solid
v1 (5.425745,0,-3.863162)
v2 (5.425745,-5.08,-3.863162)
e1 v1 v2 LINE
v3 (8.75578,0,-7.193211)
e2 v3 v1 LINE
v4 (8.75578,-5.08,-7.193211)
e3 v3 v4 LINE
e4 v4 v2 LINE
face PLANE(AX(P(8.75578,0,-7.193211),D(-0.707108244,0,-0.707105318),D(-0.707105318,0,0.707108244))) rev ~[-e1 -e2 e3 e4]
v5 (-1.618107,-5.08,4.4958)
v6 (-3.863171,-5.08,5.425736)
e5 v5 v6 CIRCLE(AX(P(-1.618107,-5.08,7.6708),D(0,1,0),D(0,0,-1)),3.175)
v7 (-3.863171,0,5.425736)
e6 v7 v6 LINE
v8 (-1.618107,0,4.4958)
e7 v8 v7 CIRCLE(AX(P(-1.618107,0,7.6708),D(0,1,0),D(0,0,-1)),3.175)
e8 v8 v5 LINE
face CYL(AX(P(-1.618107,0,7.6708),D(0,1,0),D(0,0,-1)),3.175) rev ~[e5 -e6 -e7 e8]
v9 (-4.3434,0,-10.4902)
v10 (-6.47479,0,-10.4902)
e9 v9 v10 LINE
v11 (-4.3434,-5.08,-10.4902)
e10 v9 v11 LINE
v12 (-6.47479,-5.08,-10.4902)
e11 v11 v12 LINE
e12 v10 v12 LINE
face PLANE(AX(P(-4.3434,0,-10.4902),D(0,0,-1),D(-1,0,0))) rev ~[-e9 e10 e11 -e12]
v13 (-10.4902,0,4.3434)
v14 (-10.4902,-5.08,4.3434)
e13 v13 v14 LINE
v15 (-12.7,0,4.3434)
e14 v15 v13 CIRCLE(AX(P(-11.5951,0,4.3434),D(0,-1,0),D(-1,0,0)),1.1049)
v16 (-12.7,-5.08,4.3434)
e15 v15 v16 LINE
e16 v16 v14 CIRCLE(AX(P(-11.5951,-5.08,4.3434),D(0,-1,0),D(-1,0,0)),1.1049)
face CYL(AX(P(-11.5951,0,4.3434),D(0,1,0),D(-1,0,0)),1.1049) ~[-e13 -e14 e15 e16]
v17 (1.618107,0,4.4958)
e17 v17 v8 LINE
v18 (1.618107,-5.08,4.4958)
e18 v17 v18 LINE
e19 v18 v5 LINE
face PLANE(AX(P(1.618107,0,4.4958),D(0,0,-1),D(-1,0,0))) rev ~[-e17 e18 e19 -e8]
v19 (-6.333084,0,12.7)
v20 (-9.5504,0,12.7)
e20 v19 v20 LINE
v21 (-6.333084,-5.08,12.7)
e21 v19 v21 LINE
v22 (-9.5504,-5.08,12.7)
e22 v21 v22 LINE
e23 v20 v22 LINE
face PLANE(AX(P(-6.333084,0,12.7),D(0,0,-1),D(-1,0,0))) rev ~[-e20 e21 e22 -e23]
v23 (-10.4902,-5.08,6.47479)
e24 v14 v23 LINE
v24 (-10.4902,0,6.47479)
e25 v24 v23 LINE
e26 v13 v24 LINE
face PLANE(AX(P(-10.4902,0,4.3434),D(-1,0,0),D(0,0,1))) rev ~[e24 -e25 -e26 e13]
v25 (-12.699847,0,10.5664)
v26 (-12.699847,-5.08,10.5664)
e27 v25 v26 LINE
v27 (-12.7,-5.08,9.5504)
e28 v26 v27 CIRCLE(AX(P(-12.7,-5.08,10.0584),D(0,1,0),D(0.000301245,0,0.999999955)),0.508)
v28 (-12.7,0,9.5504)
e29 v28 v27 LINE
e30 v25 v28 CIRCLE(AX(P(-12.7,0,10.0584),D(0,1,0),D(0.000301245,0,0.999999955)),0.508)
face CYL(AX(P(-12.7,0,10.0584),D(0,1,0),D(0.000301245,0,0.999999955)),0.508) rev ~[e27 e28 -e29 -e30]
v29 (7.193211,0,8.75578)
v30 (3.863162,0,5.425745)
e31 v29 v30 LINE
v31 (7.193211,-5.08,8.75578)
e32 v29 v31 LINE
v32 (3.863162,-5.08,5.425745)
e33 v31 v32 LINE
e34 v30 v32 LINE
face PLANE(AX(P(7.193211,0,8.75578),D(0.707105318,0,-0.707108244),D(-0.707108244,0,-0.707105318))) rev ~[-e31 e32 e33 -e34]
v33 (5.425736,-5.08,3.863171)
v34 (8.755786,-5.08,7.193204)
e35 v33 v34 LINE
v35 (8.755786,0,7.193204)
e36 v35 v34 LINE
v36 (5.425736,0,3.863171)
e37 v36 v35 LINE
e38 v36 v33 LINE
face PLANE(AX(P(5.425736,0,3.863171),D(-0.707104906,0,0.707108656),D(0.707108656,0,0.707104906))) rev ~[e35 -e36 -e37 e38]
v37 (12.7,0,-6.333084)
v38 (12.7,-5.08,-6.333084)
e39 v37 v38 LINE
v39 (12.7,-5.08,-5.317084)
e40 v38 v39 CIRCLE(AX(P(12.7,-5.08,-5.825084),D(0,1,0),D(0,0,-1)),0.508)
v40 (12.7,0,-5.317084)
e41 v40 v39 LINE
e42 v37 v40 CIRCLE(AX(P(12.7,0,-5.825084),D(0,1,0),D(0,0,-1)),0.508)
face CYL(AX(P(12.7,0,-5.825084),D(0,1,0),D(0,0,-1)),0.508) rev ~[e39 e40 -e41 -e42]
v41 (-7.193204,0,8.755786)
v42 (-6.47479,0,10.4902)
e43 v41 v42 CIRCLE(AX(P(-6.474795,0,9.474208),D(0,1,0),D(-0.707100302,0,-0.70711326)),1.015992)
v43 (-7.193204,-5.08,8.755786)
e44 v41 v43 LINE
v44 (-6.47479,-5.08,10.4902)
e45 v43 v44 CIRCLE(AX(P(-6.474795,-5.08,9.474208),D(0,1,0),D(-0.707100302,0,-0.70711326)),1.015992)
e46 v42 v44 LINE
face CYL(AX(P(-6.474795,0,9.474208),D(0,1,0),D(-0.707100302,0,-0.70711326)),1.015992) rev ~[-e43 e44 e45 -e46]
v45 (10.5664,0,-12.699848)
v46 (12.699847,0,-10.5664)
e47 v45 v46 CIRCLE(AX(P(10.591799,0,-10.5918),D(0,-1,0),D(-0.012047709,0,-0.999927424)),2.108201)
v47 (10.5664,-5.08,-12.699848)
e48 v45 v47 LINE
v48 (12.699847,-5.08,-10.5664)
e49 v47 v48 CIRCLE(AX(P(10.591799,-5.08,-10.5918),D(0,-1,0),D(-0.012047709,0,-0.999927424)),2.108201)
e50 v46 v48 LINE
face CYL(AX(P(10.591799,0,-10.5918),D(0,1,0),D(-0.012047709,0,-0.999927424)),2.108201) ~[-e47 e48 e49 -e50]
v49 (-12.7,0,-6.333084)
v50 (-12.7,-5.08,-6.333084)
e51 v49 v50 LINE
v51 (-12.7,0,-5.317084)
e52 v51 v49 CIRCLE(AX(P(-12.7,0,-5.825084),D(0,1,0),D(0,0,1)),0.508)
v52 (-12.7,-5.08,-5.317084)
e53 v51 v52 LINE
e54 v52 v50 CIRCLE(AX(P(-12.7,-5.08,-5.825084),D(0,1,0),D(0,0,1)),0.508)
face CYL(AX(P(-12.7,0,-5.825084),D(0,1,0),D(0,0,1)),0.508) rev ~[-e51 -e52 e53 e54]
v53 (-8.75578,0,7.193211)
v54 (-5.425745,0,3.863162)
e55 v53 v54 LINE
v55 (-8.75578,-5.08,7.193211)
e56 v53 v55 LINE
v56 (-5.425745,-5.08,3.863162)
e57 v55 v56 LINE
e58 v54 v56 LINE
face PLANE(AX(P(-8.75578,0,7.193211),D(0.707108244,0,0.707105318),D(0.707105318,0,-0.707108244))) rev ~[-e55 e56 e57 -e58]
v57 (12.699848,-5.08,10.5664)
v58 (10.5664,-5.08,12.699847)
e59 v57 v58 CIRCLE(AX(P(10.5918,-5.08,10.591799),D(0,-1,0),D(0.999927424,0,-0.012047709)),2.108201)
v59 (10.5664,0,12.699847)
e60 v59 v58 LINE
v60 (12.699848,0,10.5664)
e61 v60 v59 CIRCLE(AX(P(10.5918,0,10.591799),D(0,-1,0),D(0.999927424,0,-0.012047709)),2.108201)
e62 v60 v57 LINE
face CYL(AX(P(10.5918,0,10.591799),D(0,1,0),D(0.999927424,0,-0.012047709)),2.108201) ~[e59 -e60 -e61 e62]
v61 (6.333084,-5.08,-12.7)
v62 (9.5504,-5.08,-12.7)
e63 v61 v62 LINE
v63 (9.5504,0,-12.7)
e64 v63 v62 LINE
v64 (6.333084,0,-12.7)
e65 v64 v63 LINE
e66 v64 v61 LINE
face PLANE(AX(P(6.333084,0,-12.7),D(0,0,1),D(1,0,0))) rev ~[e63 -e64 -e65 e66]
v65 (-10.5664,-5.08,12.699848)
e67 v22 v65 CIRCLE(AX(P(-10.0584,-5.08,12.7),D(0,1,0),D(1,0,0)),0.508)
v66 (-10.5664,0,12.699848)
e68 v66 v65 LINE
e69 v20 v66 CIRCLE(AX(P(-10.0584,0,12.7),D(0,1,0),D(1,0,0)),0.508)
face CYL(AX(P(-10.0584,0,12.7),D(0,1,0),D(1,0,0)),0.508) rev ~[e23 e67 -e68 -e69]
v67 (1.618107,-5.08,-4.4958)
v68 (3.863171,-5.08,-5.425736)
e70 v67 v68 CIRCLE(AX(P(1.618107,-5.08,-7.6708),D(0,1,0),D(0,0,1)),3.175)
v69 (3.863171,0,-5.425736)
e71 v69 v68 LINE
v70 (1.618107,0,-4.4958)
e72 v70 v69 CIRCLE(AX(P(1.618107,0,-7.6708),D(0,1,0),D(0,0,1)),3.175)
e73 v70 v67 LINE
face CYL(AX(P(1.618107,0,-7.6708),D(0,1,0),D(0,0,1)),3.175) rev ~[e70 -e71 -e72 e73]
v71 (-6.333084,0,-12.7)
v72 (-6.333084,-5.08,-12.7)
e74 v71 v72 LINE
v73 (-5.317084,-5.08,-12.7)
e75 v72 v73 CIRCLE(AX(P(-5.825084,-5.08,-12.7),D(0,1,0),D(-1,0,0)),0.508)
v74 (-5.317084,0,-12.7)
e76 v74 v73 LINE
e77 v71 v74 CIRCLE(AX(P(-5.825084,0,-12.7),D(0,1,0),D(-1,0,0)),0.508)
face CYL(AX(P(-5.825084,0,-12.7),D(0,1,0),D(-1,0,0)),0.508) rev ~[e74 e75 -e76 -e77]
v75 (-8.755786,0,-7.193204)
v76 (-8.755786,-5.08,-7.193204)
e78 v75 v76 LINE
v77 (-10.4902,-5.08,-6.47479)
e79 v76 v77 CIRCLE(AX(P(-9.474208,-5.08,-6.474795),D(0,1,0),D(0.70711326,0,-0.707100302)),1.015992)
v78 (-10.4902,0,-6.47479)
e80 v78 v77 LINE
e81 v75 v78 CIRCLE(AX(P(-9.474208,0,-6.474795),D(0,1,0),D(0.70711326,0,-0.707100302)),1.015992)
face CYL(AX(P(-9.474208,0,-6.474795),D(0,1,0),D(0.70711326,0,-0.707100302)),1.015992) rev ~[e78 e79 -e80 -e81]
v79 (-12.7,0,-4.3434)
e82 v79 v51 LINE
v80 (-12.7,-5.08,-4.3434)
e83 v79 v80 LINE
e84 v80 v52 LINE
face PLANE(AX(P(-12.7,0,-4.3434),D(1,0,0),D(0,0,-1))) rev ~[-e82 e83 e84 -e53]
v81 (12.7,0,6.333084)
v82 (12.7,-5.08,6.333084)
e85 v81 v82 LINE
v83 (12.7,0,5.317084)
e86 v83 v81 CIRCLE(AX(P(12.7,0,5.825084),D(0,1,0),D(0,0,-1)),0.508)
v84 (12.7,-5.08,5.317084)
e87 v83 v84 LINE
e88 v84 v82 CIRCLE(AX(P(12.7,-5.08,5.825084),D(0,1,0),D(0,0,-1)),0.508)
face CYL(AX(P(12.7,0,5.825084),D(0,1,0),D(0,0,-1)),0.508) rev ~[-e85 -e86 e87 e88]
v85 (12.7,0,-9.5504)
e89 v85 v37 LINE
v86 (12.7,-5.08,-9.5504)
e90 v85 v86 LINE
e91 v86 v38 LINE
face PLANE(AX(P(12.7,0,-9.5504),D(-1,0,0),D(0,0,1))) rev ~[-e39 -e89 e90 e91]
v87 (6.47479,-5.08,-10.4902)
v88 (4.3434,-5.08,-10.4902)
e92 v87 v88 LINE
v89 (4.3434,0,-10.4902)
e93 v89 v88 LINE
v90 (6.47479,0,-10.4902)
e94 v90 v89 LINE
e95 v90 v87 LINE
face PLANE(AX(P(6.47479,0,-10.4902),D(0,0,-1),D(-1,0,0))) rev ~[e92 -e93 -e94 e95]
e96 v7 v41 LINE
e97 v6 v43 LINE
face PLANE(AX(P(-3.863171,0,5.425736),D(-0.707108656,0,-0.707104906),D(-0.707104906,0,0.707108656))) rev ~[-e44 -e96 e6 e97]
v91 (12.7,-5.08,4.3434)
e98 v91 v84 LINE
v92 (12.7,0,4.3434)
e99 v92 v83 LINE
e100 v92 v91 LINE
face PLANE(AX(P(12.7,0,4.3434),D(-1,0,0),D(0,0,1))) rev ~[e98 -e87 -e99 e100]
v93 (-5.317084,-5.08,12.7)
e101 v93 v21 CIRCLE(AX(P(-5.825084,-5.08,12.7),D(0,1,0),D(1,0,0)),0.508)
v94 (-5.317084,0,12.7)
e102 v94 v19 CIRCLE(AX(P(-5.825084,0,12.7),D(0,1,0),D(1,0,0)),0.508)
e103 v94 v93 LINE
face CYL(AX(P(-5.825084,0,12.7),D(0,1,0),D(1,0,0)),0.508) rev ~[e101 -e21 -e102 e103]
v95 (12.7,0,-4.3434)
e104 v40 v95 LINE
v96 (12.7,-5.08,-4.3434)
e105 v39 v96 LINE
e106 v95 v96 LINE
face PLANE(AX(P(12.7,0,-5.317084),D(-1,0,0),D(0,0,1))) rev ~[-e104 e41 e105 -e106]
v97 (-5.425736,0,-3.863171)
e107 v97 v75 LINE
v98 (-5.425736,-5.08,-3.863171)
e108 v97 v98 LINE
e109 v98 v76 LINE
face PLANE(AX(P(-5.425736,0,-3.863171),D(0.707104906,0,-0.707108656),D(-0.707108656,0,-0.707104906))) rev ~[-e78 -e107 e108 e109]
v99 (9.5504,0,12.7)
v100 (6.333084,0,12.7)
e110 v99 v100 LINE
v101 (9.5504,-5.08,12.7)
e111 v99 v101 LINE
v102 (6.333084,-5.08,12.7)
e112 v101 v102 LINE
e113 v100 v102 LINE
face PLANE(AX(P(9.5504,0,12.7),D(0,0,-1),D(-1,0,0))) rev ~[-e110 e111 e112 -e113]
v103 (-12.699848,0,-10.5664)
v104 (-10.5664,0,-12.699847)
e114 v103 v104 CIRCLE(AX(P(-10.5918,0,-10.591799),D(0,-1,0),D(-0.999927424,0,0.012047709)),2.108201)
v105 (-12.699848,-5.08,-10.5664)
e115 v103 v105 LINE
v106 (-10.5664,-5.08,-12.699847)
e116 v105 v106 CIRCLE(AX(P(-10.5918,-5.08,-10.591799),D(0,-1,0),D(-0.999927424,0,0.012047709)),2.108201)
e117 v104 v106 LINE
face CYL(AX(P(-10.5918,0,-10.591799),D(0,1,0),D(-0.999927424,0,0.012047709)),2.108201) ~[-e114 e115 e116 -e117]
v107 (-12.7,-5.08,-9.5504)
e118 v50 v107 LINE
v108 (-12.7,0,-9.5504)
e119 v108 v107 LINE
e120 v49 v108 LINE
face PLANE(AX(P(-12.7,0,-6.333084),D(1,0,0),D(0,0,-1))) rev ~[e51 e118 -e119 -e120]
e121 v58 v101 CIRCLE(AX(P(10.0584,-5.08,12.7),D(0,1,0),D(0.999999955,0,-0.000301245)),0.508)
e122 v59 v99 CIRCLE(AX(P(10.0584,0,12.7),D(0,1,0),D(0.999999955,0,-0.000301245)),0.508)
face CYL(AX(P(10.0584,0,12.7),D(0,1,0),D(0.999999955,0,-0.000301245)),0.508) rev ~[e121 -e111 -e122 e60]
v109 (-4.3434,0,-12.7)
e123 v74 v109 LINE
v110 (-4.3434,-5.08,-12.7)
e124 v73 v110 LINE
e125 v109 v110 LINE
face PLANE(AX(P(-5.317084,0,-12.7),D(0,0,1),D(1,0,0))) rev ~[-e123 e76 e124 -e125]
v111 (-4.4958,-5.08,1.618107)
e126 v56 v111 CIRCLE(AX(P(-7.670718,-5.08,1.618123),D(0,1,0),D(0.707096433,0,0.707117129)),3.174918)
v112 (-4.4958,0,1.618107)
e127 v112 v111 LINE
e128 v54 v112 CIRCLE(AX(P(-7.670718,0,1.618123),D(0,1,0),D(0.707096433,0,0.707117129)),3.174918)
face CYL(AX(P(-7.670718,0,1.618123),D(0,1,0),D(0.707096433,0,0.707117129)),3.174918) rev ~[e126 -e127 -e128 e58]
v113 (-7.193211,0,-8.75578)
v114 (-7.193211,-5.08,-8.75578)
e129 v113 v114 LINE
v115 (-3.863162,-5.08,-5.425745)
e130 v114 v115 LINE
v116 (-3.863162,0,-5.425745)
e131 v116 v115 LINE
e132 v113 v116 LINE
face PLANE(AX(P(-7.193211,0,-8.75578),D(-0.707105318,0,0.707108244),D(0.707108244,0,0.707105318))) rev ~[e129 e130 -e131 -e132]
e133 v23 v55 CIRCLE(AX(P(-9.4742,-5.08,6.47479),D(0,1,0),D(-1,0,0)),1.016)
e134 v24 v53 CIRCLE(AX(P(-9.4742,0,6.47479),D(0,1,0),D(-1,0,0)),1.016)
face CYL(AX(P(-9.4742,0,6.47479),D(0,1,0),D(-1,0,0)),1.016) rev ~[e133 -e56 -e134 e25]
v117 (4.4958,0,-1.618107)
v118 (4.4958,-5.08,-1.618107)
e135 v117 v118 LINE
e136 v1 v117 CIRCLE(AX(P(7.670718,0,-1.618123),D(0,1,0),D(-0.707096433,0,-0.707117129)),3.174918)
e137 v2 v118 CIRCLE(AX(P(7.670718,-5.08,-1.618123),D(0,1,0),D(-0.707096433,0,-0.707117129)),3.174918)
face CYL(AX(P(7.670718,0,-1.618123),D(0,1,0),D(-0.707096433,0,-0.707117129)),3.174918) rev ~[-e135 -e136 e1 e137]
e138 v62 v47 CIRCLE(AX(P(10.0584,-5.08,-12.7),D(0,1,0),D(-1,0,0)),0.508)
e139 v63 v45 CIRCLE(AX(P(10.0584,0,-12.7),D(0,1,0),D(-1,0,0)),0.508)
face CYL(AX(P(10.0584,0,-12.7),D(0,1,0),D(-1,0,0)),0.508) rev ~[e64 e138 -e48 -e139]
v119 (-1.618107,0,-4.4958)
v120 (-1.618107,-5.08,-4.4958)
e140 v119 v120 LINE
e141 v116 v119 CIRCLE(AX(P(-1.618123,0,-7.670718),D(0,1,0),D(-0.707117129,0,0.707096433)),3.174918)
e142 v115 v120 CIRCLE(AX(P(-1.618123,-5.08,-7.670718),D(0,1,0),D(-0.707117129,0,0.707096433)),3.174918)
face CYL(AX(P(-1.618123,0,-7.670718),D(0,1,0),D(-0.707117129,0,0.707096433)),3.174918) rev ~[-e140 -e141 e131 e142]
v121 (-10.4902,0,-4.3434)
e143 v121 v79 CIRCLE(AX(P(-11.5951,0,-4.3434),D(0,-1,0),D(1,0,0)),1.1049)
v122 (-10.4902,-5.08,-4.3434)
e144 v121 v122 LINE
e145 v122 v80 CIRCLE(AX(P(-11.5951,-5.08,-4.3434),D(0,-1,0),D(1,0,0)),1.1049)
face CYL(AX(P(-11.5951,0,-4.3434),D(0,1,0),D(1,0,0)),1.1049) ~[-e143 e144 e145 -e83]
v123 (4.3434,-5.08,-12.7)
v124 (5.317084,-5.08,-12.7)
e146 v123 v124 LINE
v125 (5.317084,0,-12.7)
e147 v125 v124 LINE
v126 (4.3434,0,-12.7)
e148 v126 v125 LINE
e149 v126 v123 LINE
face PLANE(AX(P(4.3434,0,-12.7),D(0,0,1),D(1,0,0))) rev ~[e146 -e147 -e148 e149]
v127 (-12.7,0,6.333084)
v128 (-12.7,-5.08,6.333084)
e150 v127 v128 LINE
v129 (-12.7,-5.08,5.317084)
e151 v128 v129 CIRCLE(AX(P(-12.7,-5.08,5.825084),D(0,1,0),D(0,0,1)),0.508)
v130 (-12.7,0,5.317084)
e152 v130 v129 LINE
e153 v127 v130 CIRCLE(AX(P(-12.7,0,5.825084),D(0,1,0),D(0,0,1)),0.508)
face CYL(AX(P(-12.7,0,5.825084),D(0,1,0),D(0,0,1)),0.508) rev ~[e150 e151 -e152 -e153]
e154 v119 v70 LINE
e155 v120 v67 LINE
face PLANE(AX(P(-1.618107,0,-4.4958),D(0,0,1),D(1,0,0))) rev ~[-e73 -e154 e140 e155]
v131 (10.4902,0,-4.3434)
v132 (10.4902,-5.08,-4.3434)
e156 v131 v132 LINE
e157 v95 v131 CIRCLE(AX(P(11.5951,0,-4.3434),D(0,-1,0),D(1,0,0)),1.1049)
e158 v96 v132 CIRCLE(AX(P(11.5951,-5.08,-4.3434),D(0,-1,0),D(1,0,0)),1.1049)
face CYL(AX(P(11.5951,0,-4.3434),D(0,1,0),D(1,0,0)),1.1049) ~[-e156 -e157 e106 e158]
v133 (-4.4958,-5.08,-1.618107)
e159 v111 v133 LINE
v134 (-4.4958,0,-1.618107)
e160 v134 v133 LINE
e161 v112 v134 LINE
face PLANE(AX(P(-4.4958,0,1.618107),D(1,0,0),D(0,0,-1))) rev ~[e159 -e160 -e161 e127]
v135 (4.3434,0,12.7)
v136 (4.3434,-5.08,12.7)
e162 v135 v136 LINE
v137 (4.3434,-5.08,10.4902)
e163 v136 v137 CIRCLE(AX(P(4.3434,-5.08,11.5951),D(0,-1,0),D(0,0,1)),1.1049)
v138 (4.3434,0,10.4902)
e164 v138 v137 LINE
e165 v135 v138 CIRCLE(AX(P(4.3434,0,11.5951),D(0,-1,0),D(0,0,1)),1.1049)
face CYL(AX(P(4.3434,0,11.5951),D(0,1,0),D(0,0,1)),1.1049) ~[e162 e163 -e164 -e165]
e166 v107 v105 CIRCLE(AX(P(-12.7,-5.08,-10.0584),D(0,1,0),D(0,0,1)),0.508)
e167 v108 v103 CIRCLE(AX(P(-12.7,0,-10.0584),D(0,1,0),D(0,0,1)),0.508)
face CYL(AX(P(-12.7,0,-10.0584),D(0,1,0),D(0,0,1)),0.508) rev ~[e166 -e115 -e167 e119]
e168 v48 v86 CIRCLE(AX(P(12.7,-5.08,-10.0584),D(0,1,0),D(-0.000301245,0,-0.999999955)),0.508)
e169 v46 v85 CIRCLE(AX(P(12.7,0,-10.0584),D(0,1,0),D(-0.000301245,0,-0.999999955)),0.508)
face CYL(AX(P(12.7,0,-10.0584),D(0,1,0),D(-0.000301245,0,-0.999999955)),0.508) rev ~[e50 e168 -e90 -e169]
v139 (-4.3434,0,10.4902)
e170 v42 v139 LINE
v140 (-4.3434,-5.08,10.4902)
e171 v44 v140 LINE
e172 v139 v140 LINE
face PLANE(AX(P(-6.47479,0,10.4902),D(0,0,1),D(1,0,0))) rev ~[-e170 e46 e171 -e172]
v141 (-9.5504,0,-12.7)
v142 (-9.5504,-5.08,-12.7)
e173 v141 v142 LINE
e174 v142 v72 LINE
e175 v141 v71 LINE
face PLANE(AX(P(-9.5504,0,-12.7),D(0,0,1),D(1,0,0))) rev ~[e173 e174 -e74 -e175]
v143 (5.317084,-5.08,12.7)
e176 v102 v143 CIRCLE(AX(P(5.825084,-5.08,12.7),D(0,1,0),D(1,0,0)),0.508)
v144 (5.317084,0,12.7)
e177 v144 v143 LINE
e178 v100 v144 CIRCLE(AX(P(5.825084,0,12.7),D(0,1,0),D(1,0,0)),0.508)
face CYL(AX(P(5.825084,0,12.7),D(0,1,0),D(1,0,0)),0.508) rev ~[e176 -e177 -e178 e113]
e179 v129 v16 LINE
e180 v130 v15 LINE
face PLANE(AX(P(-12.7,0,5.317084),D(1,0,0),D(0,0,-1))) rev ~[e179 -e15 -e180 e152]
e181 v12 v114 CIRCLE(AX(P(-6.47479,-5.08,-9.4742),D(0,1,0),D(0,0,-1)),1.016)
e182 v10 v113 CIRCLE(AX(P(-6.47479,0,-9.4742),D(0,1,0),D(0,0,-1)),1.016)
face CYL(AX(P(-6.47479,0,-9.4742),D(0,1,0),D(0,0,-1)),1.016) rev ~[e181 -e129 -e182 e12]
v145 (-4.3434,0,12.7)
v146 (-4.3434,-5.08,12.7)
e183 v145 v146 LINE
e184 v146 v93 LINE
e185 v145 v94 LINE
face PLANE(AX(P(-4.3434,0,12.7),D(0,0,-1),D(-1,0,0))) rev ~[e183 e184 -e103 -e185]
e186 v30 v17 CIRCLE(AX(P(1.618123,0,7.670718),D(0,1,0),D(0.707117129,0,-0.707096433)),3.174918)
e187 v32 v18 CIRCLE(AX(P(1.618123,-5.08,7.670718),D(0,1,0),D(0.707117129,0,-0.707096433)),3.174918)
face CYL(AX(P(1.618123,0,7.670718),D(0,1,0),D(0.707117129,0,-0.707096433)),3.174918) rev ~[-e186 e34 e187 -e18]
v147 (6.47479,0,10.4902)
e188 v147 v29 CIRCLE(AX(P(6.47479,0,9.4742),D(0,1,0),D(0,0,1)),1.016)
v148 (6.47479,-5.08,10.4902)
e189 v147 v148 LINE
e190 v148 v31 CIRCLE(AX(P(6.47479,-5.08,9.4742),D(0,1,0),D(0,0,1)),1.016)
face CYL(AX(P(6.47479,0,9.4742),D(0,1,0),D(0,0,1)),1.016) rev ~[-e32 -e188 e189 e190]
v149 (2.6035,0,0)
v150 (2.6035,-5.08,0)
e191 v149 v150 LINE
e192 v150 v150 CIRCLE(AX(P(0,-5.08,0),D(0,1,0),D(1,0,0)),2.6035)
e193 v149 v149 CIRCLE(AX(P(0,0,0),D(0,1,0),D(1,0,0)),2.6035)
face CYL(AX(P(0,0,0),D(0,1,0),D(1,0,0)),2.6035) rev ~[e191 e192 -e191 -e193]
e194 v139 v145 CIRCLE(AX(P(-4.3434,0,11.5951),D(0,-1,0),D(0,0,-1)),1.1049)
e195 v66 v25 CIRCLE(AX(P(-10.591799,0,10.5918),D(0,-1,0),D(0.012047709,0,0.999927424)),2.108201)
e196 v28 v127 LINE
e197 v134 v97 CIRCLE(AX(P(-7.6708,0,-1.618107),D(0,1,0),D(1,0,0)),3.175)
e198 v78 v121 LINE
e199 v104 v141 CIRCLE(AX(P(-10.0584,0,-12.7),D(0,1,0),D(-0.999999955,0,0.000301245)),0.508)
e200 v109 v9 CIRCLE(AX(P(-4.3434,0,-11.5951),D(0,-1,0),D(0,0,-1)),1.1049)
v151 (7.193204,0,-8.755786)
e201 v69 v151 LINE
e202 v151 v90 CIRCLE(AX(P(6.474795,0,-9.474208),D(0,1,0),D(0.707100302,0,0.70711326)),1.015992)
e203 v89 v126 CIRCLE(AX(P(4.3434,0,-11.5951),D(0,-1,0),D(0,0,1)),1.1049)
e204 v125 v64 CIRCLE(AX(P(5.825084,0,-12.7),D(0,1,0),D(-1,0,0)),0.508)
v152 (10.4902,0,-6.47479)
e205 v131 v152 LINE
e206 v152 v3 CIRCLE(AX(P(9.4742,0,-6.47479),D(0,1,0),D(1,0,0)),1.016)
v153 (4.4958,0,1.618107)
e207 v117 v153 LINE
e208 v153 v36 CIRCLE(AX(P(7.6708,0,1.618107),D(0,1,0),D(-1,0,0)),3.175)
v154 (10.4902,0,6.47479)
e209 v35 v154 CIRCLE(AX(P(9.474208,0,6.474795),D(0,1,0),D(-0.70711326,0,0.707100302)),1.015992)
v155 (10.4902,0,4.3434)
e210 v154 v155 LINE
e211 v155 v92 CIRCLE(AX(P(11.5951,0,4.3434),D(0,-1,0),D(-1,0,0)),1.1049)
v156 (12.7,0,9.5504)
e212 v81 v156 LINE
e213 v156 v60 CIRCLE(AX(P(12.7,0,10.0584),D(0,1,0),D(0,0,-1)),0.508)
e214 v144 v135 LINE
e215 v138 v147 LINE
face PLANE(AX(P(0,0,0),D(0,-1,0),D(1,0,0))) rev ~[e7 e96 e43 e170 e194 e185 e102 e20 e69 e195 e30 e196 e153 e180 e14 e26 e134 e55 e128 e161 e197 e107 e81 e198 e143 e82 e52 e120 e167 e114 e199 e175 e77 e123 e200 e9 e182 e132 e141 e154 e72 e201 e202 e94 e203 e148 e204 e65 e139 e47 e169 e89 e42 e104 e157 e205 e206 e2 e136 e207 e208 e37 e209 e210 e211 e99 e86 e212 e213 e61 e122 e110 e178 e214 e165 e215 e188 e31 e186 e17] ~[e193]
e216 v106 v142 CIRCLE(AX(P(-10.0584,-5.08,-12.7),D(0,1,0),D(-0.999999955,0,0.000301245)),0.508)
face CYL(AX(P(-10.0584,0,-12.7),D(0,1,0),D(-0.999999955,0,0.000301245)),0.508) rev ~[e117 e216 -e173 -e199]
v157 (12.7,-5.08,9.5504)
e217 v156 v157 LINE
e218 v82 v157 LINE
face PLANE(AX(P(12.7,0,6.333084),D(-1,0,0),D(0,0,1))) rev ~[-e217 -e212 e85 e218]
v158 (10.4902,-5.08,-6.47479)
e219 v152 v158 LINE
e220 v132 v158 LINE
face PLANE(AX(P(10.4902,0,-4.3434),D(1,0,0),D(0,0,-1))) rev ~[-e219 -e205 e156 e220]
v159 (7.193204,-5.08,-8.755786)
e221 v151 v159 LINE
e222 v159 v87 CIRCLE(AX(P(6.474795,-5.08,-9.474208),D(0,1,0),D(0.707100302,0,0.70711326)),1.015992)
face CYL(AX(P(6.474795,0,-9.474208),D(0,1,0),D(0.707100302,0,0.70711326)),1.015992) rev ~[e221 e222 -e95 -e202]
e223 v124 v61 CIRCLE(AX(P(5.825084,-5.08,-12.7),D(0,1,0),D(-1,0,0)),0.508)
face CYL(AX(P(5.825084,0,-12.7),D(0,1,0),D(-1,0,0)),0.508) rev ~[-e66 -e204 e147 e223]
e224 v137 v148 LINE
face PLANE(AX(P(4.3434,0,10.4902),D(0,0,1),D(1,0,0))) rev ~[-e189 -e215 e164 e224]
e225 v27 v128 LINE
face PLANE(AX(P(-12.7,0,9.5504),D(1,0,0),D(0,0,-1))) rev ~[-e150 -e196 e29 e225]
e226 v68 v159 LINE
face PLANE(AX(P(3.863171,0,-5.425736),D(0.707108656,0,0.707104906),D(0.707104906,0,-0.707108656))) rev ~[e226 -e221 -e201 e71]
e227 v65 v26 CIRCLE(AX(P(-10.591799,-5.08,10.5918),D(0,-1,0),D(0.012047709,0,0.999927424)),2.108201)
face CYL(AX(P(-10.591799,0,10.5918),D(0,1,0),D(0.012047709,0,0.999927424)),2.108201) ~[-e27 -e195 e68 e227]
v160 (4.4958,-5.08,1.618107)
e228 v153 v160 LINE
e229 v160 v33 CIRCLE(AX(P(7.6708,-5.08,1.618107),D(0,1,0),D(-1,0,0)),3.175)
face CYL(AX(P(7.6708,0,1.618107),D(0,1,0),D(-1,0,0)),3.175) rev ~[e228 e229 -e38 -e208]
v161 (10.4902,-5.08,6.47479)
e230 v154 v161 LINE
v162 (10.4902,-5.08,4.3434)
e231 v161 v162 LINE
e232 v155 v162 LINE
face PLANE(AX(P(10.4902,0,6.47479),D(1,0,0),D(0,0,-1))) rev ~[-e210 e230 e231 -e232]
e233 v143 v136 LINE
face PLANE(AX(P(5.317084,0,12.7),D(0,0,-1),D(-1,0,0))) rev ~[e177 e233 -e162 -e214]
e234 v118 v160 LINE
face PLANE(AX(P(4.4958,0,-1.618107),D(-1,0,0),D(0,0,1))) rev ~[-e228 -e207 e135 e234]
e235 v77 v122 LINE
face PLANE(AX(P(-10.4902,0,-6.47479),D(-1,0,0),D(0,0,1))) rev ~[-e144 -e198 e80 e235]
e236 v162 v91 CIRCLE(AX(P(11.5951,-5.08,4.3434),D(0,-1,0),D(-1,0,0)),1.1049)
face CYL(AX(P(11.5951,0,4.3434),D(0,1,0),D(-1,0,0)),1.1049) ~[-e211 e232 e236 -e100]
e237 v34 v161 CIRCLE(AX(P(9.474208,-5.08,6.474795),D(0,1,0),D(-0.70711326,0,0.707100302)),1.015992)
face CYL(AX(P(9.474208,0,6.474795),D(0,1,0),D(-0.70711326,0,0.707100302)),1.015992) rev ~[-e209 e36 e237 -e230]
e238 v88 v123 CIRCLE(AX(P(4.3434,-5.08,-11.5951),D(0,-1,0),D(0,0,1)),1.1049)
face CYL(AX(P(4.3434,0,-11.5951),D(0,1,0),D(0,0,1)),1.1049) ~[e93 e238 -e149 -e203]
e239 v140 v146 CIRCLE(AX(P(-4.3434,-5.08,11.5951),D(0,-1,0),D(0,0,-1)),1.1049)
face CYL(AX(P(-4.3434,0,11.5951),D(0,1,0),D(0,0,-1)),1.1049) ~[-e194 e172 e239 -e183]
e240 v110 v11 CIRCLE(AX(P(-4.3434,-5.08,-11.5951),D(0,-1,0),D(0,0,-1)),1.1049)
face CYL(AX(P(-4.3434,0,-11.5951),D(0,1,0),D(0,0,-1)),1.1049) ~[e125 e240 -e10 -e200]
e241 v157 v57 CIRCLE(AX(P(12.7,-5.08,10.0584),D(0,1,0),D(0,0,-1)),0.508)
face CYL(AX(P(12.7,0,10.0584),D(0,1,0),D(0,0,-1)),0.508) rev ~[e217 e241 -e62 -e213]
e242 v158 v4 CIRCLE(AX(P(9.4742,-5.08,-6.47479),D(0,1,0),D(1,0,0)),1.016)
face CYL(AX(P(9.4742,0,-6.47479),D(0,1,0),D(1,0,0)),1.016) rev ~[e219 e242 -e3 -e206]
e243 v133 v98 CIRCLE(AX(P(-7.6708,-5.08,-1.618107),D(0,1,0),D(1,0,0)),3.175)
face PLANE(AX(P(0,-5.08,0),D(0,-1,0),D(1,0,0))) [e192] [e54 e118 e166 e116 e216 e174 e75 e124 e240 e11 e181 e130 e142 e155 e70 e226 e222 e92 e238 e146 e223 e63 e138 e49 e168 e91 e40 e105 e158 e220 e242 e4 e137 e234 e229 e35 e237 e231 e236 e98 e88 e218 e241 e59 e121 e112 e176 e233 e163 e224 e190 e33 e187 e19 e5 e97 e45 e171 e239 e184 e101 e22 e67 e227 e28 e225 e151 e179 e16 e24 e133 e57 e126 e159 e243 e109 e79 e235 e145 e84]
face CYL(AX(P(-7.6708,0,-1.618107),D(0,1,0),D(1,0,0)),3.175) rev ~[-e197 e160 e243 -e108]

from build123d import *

# Parameters (mm, degrees)
F1_DEPTH = 5.08


# Not quite as in the source:
# - ends of sketch curves that miss each other by under 0.0002 mm in the source are joined


with BuildPart() as f1:
    # F0 (on Front) → F1 (new body)
    with BuildSketch(Plane.XZ):
        with BuildLine():
            ThreePointArc((-12.7, -9.5504), (-12.1920000057, -10.0583238), (-12.6998476, -10.5663999771))
            ThreePointArc((-12.6998476, -10.5663999771), (-12.0825225161, -12.0825225161), (-10.5664000074, -12.6998469825))
            ThreePointArc((-10.5664000074, -12.6998469825), (-10.0583238, -12.1920000057), (-9.5504, -12.7))
            Line((-9.5504, -12.7), (-6.3330836, -12.7))
            ThreePointArc((-6.3330836, -12.7), (-5.8250836, -12.192), (-5.3170836, -12.7))
            Line((-5.3170836, -12.7), (-4.3434, -12.7))
            ThreePointArc((-4.3434, -12.7), (-3.2385, -11.5951), (-4.3434, -10.4902))
            Line((-4.3434, -10.4902), (-6.4747902, -10.4902))
            ThreePointArc((-6.4747902, -10.4902), (-7.413451805, -9.8630063673), (-7.1932106897, -8.7557795103))
            Line((-7.1932106897, -8.7557795103), (-3.8631622, -5.4257448))
            ThreePointArc((-3.8631622, -5.4257448), (-2.8331268978, -4.7374824843), (-1.618107, -4.4958))
            Line((-1.618107, -4.4958), (1.618107, -4.4958))
            ThreePointArc((1.618107, -4.4958), (2.8331268978, -4.7374824843), (3.8631710303, -5.4257359697))
            Line((3.8631710303, -5.4257359697), (7.1932038, -8.7557864))
            ThreePointArc((7.1932038, -8.7557864), (7.413451805, -9.8630063673), (6.4747902, -10.4902))
            Line((6.4747902, -10.4902), (4.3434, -10.4902))
            ThreePointArc((4.3434, -10.4902), (3.2385, -11.5951), (4.3434, -12.7))
            Line((4.3434, -12.7), (5.3170836, -12.7))
            ThreePointArc((5.3170836, -12.7), (5.8250836, -12.192), (6.3330836, -12.7))
            Line((6.3330836, -12.7), (9.5504, -12.7))
            ThreePointArc((9.5504, -12.7), (10.0583238, -12.1920000057), (10.5663999771, -12.6998476))
            ThreePointArc((10.5663999771, -12.6998476), (12.0825225161, -12.0825225161), (12.6998469825, -10.5664000074))
            ThreePointArc((12.6998469825, -10.5664000074), (12.1920000057, -10.0583238), (12.7, -9.5504))
            Line((12.7, -9.5504), (12.7, -6.3330836))
            ThreePointArc((12.7, -6.3330836), (12.192, -5.8250836), (12.7, -5.3170836))
            Line((12.7, -5.3170836), (12.7, -4.3434))
            ThreePointArc((12.7, -4.3434), (11.5951, -3.2385), (10.4902, -4.3434))
            Line((10.4902, -4.3434), (10.4902, -6.4747902))
            ThreePointArc((10.4902, -6.4747902), (9.8630063673, -7.413451805), (8.7557795103, -7.1932106897))
            Line((8.7557795103, -7.1932106897), (5.4257448, -3.8631622))
            ThreePointArc((5.4257448, -3.8631622), (4.7374824843, -2.8331268978), (4.4958, -1.618107))
            Line((4.4958, -1.618107), (4.4958, 1.618107))
            ThreePointArc((4.4958, 1.618107), (4.7374824843, 2.8331268978), (5.4257359697, 3.8631710303))
            Line((5.4257359697, 3.8631710303), (8.7557864, 7.1932038))
            ThreePointArc((8.7557864, 7.1932038), (9.8630063673, 7.413451805), (10.4902, 6.4747902))
            Line((10.4902, 6.4747902), (10.4902, 4.3434))
            ThreePointArc((10.4902, 4.3434), (11.5951, 3.2385), (12.7, 4.3434))
            Line((12.7, 4.3434), (12.7, 5.3170836))
            ThreePointArc((12.7, 5.3170836), (12.192, 5.8250836), (12.7, 6.3330836))
            Line((12.7, 6.3330836), (12.7, 9.5504))
            ThreePointArc((12.7, 9.5504), (12.1920000057, 10.0583238), (12.6998476, 10.5663999771))
            ThreePointArc((12.6998476, 10.5663999771), (12.0825225161, 12.0825225161), (10.5664000074, 12.6998469825))
            ThreePointArc((10.5664000074, 12.6998469825), (10.0583238, 12.1920000057), (9.5504, 12.7))
            Line((9.5504, 12.7), (6.3330836, 12.7))
            ThreePointArc((6.3330836, 12.7), (5.8250836, 12.192), (5.3170836, 12.7))
            Line((5.3170836, 12.7), (4.3434, 12.7))
            ThreePointArc((4.3434, 12.7), (3.2385, 11.5951), (4.3434, 10.4902))
            Line((4.3434, 10.4902), (6.4747902, 10.4902))
            ThreePointArc((6.4747902, 10.4902), (7.413451805, 9.8630063673), (7.1932106897, 8.7557795103))
            Line((7.1932106897, 8.7557795103), (3.8631622, 5.4257448))
            ThreePointArc((3.8631622, 5.4257448), (2.8331268978, 4.7374824843), (1.618107, 4.4958))
            Line((1.618107, 4.4958), (-1.618107, 4.4958))
            ThreePointArc((-1.618107, 4.4958), (-2.8331268978, 4.7374824843), (-3.8631710303, 5.4257359697))
            Line((-3.8631710303, 5.4257359697), (-7.1932038, 8.7557864))
            ThreePointArc((-7.1932038, 8.7557864), (-7.413451805, 9.8630063673), (-6.4747902, 10.4902))
            Line((-6.4747902, 10.4902), (-4.3434, 10.4902))
            ThreePointArc((-4.3434, 10.4902), (-3.2385, 11.5951), (-4.3434, 12.7))
            Line((-4.3434, 12.7), (-5.3170836, 12.7))
            ThreePointArc((-5.3170836, 12.7), (-5.8250836, 12.192), (-6.3330836, 12.7))
            Line((-6.3330836, 12.7), (-9.5504, 12.7))
            ThreePointArc((-9.5504, 12.7), (-10.0583238, 12.1920000057), (-10.5663999771, 12.6998476))
            ThreePointArc((-10.5663999771, 12.6998476), (-12.0825225161, 12.0825225161), (-12.6998469825, 10.5664000074))
            ThreePointArc((-12.6998469825, 10.5664000074), (-12.1920000057, 10.0583238), (-12.7, 9.5504))
            Line((-12.7, 9.5504), (-12.7, 6.3330836))
            ThreePointArc((-12.7, 6.3330836), (-12.192, 5.8250836), (-12.7, 5.3170836))
            Line((-12.7, 5.3170836), (-12.7, 4.3434))
            ThreePointArc((-12.7, 4.3434), (-11.5951, 3.2385), (-10.4902, 4.3434))
            Line((-10.4902, 4.3434), (-10.4902, 6.4747902))
            ThreePointArc((-10.4902, 6.4747902), (-9.8630063673, 7.413451805), (-8.7557795103, 7.1932106897))
            Line((-8.7557795103, 7.1932106897), (-5.4257448, 3.8631622))
            ThreePointArc((-5.4257448, 3.8631622), (-4.7374824843, 2.8331268978), (-4.4958, 1.618107))
            Line((-4.4958, 1.618107), (-4.4958, -1.618107))
            ThreePointArc((-4.4958, -1.618107), (-4.7374824843, -2.8331268978), (-5.4257359697, -3.8631710303))
            Line((-5.4257359697, -3.8631710303), (-8.7557864, -7.1932038))
            ThreePointArc((-8.7557864, -7.1932038), (-9.8630063673, -7.413451805), (-10.4902, -6.4747902))
            Line((-10.4902, -6.4747902), (-10.4902, -4.3434))
            ThreePointArc((-10.4902, -4.3434), (-11.5951, -3.2385), (-12.7, -4.3434))
            Line((-12.7, -4.3434), (-12.7, -5.3170836))
            ThreePointArc((-12.7, -5.3170836), (-12.192, -5.8250836), (-12.7, -6.3330836))
            Line((-12.7, -6.3330836), (-12.7, -9.5504))
        make_face()
        with BuildLine():
            ThreePointArc((-2.6035, 0), (0, 2.6035), (2.6035, 0))
            ThreePointArc((2.6035, 0), (0, -2.6035), (-2.6035, 0))
        make_face(mode=Mode.SUBTRACT)
    extrude(amount=F1_DEPTH)


solid = f1.part
